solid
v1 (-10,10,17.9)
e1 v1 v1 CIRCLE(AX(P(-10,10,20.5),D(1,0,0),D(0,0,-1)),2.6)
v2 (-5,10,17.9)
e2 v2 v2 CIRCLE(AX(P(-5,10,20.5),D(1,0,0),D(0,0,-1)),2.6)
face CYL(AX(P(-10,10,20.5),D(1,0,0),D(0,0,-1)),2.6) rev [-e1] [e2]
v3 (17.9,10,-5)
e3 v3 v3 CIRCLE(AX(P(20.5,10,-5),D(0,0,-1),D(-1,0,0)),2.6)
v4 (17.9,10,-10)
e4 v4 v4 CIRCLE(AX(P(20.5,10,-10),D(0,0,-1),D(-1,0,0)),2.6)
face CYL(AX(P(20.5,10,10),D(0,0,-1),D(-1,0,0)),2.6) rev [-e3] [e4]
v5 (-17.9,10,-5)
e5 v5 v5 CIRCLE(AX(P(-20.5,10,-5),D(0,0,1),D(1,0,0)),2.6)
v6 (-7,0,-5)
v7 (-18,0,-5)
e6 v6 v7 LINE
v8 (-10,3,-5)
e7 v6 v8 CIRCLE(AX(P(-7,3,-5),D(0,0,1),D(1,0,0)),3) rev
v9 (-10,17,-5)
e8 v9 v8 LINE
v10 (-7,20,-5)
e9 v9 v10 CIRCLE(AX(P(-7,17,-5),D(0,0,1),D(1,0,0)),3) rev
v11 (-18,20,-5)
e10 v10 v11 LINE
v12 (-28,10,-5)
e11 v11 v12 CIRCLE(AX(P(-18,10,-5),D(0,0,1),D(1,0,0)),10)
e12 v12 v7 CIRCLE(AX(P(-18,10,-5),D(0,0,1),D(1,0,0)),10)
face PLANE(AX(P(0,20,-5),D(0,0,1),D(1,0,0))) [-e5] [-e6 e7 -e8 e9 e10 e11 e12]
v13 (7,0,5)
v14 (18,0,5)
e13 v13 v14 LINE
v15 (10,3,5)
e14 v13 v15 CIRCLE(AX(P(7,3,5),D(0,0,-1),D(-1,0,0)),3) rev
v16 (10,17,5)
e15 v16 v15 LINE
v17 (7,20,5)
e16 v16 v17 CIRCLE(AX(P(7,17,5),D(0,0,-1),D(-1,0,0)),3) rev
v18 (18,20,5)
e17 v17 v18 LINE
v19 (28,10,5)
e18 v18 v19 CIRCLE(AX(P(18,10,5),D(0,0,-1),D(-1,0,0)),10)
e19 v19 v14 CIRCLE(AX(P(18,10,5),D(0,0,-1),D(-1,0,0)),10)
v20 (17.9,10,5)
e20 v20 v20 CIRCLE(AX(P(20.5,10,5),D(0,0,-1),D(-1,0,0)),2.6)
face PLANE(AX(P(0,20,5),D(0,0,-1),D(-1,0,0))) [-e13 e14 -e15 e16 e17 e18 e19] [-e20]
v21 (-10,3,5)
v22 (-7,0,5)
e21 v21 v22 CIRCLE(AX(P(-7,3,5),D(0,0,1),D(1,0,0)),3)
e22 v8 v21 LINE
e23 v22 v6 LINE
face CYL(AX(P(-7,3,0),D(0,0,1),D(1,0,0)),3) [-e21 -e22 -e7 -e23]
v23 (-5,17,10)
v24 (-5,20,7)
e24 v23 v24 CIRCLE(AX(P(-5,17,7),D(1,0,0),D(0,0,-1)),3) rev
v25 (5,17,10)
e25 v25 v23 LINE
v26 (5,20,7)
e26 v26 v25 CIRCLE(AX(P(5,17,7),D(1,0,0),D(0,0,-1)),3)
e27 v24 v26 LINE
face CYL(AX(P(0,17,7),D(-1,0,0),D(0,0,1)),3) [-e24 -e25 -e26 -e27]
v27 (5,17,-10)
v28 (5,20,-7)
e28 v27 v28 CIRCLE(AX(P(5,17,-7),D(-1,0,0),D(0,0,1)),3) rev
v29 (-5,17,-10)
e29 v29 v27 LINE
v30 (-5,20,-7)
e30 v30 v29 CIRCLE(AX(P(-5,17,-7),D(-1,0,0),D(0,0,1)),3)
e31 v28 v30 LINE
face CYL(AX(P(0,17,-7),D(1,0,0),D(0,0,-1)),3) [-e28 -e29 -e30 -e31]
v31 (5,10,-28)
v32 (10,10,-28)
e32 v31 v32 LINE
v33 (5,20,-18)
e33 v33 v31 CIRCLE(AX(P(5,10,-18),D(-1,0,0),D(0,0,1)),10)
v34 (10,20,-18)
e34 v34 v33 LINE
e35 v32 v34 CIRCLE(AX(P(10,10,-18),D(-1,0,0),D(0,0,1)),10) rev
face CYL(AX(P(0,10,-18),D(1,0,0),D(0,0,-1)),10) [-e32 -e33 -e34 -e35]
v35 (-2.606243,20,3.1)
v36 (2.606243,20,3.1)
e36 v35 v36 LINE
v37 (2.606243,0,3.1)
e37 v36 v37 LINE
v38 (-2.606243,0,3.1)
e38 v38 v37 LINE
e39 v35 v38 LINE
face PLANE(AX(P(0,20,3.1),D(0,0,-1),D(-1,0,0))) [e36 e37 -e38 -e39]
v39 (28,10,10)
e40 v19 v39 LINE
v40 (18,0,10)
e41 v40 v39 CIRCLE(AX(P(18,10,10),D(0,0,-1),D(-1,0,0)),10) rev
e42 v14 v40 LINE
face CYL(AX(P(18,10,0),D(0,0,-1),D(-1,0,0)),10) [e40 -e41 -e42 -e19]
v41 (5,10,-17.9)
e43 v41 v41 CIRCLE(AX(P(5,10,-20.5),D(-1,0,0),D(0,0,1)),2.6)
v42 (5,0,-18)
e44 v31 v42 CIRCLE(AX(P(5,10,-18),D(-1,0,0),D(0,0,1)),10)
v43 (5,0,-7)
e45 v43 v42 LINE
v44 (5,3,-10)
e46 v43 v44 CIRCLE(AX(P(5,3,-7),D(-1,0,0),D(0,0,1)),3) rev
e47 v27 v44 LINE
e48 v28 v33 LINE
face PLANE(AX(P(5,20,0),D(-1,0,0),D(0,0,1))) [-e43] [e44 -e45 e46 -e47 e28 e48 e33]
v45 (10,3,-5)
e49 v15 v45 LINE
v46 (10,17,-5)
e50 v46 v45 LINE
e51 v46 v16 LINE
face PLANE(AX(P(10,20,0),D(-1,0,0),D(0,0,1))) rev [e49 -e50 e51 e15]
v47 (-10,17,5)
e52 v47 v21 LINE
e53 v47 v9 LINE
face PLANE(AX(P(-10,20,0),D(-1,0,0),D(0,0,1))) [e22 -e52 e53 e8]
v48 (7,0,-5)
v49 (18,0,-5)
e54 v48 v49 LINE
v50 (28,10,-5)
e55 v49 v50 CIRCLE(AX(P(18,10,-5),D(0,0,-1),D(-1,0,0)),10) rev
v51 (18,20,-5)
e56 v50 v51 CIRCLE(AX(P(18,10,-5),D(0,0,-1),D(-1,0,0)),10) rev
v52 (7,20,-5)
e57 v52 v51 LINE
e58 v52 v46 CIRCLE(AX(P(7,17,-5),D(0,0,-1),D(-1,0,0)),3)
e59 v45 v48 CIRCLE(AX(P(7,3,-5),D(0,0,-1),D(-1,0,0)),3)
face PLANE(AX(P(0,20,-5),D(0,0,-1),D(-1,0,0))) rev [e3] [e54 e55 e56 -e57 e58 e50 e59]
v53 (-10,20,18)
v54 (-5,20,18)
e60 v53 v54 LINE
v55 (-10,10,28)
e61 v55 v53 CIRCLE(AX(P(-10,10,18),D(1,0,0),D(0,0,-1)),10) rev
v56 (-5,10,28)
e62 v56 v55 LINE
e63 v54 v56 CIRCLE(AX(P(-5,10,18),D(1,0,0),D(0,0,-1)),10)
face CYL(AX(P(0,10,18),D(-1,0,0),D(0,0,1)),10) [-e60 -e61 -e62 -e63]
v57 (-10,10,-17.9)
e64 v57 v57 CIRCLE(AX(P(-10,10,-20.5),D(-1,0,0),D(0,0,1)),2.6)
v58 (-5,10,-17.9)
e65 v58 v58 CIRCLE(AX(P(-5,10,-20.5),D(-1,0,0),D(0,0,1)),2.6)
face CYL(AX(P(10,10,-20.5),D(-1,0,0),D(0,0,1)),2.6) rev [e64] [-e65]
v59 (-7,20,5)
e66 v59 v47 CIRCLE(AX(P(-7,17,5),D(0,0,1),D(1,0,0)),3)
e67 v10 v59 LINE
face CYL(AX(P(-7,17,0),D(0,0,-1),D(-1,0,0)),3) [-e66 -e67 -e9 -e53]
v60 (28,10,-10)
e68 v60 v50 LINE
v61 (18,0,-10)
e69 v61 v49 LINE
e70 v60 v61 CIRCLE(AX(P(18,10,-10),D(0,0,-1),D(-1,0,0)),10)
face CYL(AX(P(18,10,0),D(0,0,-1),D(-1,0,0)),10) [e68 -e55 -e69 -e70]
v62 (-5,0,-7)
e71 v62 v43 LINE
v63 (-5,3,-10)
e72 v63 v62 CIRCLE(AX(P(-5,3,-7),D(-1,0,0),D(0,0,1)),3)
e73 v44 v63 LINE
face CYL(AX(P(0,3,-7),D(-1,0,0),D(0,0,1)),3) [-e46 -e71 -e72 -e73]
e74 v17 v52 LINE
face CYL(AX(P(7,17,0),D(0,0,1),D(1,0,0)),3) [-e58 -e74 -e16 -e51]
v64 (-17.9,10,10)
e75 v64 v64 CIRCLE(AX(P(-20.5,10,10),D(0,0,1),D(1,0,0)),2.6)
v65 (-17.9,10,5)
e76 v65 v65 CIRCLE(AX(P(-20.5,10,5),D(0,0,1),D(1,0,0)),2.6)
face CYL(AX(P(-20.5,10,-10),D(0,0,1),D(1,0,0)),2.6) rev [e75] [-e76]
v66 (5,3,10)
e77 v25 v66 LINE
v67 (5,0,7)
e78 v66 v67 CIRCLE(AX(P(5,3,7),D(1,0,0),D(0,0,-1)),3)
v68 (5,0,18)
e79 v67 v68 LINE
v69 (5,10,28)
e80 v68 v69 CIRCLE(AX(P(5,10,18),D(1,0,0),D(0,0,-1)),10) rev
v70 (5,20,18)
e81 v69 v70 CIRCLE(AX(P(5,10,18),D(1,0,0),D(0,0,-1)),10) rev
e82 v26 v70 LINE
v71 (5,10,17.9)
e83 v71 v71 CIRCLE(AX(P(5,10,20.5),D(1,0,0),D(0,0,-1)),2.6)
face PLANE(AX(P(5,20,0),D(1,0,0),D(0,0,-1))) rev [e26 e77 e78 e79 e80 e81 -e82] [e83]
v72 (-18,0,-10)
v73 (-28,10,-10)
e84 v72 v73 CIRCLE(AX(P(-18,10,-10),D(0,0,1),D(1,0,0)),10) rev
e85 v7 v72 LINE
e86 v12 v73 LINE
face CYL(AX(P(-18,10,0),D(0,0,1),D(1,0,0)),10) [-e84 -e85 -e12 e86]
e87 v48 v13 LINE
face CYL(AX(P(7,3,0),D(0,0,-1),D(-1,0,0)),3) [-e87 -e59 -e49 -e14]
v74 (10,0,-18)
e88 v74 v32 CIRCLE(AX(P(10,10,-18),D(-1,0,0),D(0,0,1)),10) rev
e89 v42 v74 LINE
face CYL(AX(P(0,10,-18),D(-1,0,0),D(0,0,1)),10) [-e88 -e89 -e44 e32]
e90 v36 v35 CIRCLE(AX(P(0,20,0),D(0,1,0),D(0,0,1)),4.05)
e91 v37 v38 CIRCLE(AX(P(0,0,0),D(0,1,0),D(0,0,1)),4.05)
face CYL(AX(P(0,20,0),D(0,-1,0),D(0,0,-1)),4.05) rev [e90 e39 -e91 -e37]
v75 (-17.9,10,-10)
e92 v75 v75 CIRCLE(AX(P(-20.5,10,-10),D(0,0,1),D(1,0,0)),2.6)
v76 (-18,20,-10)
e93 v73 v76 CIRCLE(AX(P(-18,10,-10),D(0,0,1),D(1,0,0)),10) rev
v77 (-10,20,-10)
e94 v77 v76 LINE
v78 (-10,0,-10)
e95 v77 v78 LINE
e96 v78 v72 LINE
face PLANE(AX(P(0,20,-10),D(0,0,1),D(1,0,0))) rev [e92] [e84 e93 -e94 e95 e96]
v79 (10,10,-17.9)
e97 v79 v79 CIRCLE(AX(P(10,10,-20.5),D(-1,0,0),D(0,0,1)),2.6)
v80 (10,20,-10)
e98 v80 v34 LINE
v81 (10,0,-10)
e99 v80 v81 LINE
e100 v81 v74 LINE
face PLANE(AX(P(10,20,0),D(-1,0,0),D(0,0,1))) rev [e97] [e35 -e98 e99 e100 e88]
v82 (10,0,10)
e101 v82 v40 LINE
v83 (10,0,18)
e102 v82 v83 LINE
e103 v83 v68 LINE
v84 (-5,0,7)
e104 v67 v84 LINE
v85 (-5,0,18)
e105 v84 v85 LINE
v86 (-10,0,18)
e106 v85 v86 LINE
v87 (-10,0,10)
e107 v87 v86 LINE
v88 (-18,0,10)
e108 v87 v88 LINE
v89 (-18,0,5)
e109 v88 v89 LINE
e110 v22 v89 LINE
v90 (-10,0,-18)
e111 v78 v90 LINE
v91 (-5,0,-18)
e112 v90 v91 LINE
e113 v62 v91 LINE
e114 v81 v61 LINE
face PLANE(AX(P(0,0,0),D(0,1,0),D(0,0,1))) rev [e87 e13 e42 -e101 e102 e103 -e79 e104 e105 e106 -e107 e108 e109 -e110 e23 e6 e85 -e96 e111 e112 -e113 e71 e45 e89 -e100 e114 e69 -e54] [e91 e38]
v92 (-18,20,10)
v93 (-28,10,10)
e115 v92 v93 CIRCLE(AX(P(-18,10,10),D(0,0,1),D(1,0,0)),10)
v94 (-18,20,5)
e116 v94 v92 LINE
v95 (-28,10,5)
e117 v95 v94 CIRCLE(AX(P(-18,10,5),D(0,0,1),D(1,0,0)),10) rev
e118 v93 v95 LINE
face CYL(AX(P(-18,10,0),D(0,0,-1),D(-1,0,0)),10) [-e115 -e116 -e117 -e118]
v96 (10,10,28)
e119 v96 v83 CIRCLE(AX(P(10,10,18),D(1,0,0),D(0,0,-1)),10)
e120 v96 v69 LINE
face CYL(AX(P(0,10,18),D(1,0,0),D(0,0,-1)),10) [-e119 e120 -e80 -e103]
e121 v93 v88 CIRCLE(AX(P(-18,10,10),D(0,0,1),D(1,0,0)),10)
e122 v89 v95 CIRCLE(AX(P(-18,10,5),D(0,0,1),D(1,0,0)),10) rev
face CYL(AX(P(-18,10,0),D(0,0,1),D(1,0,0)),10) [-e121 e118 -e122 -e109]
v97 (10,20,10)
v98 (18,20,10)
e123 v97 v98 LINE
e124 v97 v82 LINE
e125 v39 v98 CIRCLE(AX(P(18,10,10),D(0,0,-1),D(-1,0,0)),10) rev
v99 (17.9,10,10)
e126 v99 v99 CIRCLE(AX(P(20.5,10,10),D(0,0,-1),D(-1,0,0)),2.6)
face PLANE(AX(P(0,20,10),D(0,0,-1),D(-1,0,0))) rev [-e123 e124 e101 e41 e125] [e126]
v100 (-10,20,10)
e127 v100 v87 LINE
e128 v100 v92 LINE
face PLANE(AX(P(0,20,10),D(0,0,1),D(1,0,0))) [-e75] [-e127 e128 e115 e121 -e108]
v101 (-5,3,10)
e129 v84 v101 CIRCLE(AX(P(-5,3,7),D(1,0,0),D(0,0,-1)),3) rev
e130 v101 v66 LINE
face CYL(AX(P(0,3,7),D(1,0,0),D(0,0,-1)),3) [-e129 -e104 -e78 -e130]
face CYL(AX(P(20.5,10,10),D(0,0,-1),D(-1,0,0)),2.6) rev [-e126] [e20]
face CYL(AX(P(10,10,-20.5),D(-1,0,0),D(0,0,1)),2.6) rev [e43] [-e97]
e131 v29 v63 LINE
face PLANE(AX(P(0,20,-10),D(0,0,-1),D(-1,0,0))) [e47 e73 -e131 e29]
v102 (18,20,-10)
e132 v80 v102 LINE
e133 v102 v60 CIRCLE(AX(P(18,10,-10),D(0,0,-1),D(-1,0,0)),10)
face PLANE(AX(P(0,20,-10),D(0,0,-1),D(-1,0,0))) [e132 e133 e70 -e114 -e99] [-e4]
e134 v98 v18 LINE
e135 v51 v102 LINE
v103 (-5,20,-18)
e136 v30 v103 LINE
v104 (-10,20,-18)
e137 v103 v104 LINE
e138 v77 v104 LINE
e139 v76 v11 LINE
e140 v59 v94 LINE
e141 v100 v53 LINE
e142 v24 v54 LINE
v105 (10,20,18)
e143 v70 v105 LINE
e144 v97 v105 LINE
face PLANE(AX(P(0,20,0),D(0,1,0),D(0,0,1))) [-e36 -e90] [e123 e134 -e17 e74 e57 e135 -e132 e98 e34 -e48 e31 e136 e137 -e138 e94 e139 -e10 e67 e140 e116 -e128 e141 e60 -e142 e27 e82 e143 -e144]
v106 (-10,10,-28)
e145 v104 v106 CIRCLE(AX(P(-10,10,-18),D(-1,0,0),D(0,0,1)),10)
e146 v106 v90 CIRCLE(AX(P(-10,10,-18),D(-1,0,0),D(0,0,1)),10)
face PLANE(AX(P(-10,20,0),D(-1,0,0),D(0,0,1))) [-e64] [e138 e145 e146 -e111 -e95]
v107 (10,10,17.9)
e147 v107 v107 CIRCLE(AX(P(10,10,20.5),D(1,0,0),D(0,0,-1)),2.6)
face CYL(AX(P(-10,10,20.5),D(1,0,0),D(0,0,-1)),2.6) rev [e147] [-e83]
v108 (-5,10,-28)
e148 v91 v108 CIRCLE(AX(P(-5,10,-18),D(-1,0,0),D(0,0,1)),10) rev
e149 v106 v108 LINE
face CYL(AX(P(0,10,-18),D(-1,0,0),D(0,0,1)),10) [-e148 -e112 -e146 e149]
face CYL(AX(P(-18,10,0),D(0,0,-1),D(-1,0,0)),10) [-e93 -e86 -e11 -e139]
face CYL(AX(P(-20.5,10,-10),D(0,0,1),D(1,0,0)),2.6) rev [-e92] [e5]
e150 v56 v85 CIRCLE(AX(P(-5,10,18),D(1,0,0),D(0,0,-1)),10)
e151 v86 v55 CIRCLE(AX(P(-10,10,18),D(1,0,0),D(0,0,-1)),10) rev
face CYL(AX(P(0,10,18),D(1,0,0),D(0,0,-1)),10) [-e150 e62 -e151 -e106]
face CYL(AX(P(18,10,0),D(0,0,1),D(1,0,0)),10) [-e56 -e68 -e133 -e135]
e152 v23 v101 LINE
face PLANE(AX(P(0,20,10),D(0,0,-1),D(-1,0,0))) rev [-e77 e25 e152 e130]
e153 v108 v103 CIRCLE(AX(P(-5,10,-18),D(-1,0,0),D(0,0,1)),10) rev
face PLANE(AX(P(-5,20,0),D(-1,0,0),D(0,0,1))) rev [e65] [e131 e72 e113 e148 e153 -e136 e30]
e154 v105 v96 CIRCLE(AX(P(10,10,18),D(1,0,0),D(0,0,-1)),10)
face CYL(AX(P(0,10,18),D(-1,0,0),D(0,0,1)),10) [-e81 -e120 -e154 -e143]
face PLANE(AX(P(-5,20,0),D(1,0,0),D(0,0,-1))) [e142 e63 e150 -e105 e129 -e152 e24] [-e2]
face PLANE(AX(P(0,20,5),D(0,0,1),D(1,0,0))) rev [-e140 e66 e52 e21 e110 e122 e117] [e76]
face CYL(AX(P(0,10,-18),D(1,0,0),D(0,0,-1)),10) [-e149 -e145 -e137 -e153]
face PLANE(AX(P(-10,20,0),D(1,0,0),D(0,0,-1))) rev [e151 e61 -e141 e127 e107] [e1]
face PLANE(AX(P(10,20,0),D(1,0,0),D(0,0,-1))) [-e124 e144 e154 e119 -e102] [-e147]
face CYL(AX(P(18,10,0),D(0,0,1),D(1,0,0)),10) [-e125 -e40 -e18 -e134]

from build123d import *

# Parameters (mm, degrees)
SKETCH1_W           = 20
SKETCH1_H           = 20
SKETCH1_W_2         = 18
SKETCH1_H_2         = 5
SKETCH1_W_3         = 5
SKETCH1_H_3         = 18
BOSS_EXTRUDE1_DEPTH = 20
FILLET1_R           = 10
SKETCH2_R           = 2.6
CUT_EXTRUDE1_DEPTH  = 20
CIRPATTERN1_COUNT   = 4
FILLET2_R           = 3


with BuildPart() as part:
    # Sketch1 → Boss-Extrude1 (new body)
    # profile 1 of 9: a face of its own
    with BuildSketch(Plane(origin=(0, 0, 0), x_dir=(1, 0, 0), z_dir=(0, 1, 0))):
        Rectangle(SKETCH1_W, SKETCH1_H)
        with BuildLine():
            ThreePointArc((2.606242506, -3.1), (0, 4.05), (-2.606242506, -3.1))
            Line((-2.606242506, -3.1), (2.606242506, -3.1))
        make_face(mode=Mode.SUBTRACT)
    # profile 2 of 9: a face of its own
    with BuildSketch(Plane(origin=(0, 0, 0), x_dir=(1, 0, 0), z_dir=(0, 1, 0))):
        with Locations((-19, -7.5)):
            Rectangle(SKETCH1_W_2, SKETCH1_H_2)
    # profile 3 of 9: a face of its own
    with BuildSketch(Plane(origin=(0, 0, 0), x_dir=(1, 0, 0), z_dir=(0, 1, 0))):
        with Locations((-19, 7.5)):
            Rectangle(SKETCH1_W_2, SKETCH1_H_2)
    # profile 4 of 9: a face of its own
    with BuildSketch(Plane(origin=(0, 0, 0), x_dir=(1, 0, 0), z_dir=(0, 1, 0))):
        with Locations((-7.5, 19)):
            Rectangle(SKETCH1_W_3, SKETCH1_H_3)
    # profile 5 of 9: a face of its own
    with BuildSketch(Plane(origin=(0, 0, 0), x_dir=(1, 0, 0), z_dir=(0, 1, 0))):
        with Locations((7.5, 19)):
            Rectangle(SKETCH1_W_3, SKETCH1_H_3)
    # profile 6 of 9: a face of its own
    with BuildSketch(Plane(origin=(0, 0, 0), x_dir=(1, 0, 0), z_dir=(0, 1, 0))):
        with Locations((19, 7.5)):
            Rectangle(SKETCH1_W_2, SKETCH1_H_2)
    # profile 7 of 9: a face of its own
    with BuildSketch(Plane(origin=(0, 0, 0), x_dir=(1, 0, 0), z_dir=(0, 1, 0))):
        with Locations((19, -7.5)):
            Rectangle(SKETCH1_W_2, SKETCH1_H_2)
    # profile 8 of 9: a face of its own
    with BuildSketch(Plane(origin=(0, 0, 0), x_dir=(1, 0, 0), z_dir=(0, 1, 0))):
        with Locations((7.5, -19)):
            Rectangle(SKETCH1_W_3, SKETCH1_H_3)
    # profile 9 of 9: a face of its own
    with BuildSketch(Plane(origin=(0, 0, 0), x_dir=(1, 0, 0), z_dir=(0, 1, 0))):
        with Locations((-7.5, -19)):
            Rectangle(SKETCH1_W_3, SKETCH1_H_3)
    extrude(amount=BOSS_EXTRUDE1_DEPTH)

    # Fillet1
    fillet1_edges = [part.edges().sort_by_distance(p)[0] for p in [
        (-28, 0, 7.5),
        (-28, 20, 7.5),
        (-28, 0, -7.5),
        (-28, 20, -7.5),
        (-7.5, 0, -28),
        (-7.5, 20, -28),
        (7.5, 0, -28),
        (7.5, 20, -28),
        (28, 0, -7.5),
        (28, 20, -7.5),
        (28, 0, 7.5),
        (28, 20, 7.5),
        (7.5, 0, 28),
        (7.5, 20, 28),
        (-7.5, 0, 28),
        (-7.5, 20, 28),
    ]]
    fillet(fillet1_edges, radius=FILLET1_R - 0.0001)  # a hair under: the kernel refuses the full size

    # Sketch2 → Cut-Extrude1 (cut)
    with BuildSketch(Plane.XY.offset(10)):
        with Locations((-20.5, 10)):
            Circle(SKETCH2_R)
    cut_extrude1 = extrude(amount=-CUT_EXTRUDE1_DEPTH, mode=Mode.SUBTRACT)

    # CirPattern1: Cut-Extrude1 ×4 about axis
    cirpattern1_axis = Axis((0, 21, 0), (0, -1, 0))
    for i in range(1, CIRPATTERN1_COUNT):
        add(cut_extrude1.rotate(cirpattern1_axis, i * 360 / CIRPATTERN1_COUNT), mode=Mode.SUBTRACT)

    # Fillet2
    fillet2_edges = [part.edges().sort_by_distance(p)[0] for p in [
        (-10, 20, 0),
        (0, 20, 10),
        (-10, 0, 0),
        (0, 0, -10),
        (10, 0, 0),
        (0, 0, 10),
        (10, 20, 0),
        (0, 20, -10),
    ]]
    fillet(fillet2_edges, radius=FILLET2_R)


solid = part.part
